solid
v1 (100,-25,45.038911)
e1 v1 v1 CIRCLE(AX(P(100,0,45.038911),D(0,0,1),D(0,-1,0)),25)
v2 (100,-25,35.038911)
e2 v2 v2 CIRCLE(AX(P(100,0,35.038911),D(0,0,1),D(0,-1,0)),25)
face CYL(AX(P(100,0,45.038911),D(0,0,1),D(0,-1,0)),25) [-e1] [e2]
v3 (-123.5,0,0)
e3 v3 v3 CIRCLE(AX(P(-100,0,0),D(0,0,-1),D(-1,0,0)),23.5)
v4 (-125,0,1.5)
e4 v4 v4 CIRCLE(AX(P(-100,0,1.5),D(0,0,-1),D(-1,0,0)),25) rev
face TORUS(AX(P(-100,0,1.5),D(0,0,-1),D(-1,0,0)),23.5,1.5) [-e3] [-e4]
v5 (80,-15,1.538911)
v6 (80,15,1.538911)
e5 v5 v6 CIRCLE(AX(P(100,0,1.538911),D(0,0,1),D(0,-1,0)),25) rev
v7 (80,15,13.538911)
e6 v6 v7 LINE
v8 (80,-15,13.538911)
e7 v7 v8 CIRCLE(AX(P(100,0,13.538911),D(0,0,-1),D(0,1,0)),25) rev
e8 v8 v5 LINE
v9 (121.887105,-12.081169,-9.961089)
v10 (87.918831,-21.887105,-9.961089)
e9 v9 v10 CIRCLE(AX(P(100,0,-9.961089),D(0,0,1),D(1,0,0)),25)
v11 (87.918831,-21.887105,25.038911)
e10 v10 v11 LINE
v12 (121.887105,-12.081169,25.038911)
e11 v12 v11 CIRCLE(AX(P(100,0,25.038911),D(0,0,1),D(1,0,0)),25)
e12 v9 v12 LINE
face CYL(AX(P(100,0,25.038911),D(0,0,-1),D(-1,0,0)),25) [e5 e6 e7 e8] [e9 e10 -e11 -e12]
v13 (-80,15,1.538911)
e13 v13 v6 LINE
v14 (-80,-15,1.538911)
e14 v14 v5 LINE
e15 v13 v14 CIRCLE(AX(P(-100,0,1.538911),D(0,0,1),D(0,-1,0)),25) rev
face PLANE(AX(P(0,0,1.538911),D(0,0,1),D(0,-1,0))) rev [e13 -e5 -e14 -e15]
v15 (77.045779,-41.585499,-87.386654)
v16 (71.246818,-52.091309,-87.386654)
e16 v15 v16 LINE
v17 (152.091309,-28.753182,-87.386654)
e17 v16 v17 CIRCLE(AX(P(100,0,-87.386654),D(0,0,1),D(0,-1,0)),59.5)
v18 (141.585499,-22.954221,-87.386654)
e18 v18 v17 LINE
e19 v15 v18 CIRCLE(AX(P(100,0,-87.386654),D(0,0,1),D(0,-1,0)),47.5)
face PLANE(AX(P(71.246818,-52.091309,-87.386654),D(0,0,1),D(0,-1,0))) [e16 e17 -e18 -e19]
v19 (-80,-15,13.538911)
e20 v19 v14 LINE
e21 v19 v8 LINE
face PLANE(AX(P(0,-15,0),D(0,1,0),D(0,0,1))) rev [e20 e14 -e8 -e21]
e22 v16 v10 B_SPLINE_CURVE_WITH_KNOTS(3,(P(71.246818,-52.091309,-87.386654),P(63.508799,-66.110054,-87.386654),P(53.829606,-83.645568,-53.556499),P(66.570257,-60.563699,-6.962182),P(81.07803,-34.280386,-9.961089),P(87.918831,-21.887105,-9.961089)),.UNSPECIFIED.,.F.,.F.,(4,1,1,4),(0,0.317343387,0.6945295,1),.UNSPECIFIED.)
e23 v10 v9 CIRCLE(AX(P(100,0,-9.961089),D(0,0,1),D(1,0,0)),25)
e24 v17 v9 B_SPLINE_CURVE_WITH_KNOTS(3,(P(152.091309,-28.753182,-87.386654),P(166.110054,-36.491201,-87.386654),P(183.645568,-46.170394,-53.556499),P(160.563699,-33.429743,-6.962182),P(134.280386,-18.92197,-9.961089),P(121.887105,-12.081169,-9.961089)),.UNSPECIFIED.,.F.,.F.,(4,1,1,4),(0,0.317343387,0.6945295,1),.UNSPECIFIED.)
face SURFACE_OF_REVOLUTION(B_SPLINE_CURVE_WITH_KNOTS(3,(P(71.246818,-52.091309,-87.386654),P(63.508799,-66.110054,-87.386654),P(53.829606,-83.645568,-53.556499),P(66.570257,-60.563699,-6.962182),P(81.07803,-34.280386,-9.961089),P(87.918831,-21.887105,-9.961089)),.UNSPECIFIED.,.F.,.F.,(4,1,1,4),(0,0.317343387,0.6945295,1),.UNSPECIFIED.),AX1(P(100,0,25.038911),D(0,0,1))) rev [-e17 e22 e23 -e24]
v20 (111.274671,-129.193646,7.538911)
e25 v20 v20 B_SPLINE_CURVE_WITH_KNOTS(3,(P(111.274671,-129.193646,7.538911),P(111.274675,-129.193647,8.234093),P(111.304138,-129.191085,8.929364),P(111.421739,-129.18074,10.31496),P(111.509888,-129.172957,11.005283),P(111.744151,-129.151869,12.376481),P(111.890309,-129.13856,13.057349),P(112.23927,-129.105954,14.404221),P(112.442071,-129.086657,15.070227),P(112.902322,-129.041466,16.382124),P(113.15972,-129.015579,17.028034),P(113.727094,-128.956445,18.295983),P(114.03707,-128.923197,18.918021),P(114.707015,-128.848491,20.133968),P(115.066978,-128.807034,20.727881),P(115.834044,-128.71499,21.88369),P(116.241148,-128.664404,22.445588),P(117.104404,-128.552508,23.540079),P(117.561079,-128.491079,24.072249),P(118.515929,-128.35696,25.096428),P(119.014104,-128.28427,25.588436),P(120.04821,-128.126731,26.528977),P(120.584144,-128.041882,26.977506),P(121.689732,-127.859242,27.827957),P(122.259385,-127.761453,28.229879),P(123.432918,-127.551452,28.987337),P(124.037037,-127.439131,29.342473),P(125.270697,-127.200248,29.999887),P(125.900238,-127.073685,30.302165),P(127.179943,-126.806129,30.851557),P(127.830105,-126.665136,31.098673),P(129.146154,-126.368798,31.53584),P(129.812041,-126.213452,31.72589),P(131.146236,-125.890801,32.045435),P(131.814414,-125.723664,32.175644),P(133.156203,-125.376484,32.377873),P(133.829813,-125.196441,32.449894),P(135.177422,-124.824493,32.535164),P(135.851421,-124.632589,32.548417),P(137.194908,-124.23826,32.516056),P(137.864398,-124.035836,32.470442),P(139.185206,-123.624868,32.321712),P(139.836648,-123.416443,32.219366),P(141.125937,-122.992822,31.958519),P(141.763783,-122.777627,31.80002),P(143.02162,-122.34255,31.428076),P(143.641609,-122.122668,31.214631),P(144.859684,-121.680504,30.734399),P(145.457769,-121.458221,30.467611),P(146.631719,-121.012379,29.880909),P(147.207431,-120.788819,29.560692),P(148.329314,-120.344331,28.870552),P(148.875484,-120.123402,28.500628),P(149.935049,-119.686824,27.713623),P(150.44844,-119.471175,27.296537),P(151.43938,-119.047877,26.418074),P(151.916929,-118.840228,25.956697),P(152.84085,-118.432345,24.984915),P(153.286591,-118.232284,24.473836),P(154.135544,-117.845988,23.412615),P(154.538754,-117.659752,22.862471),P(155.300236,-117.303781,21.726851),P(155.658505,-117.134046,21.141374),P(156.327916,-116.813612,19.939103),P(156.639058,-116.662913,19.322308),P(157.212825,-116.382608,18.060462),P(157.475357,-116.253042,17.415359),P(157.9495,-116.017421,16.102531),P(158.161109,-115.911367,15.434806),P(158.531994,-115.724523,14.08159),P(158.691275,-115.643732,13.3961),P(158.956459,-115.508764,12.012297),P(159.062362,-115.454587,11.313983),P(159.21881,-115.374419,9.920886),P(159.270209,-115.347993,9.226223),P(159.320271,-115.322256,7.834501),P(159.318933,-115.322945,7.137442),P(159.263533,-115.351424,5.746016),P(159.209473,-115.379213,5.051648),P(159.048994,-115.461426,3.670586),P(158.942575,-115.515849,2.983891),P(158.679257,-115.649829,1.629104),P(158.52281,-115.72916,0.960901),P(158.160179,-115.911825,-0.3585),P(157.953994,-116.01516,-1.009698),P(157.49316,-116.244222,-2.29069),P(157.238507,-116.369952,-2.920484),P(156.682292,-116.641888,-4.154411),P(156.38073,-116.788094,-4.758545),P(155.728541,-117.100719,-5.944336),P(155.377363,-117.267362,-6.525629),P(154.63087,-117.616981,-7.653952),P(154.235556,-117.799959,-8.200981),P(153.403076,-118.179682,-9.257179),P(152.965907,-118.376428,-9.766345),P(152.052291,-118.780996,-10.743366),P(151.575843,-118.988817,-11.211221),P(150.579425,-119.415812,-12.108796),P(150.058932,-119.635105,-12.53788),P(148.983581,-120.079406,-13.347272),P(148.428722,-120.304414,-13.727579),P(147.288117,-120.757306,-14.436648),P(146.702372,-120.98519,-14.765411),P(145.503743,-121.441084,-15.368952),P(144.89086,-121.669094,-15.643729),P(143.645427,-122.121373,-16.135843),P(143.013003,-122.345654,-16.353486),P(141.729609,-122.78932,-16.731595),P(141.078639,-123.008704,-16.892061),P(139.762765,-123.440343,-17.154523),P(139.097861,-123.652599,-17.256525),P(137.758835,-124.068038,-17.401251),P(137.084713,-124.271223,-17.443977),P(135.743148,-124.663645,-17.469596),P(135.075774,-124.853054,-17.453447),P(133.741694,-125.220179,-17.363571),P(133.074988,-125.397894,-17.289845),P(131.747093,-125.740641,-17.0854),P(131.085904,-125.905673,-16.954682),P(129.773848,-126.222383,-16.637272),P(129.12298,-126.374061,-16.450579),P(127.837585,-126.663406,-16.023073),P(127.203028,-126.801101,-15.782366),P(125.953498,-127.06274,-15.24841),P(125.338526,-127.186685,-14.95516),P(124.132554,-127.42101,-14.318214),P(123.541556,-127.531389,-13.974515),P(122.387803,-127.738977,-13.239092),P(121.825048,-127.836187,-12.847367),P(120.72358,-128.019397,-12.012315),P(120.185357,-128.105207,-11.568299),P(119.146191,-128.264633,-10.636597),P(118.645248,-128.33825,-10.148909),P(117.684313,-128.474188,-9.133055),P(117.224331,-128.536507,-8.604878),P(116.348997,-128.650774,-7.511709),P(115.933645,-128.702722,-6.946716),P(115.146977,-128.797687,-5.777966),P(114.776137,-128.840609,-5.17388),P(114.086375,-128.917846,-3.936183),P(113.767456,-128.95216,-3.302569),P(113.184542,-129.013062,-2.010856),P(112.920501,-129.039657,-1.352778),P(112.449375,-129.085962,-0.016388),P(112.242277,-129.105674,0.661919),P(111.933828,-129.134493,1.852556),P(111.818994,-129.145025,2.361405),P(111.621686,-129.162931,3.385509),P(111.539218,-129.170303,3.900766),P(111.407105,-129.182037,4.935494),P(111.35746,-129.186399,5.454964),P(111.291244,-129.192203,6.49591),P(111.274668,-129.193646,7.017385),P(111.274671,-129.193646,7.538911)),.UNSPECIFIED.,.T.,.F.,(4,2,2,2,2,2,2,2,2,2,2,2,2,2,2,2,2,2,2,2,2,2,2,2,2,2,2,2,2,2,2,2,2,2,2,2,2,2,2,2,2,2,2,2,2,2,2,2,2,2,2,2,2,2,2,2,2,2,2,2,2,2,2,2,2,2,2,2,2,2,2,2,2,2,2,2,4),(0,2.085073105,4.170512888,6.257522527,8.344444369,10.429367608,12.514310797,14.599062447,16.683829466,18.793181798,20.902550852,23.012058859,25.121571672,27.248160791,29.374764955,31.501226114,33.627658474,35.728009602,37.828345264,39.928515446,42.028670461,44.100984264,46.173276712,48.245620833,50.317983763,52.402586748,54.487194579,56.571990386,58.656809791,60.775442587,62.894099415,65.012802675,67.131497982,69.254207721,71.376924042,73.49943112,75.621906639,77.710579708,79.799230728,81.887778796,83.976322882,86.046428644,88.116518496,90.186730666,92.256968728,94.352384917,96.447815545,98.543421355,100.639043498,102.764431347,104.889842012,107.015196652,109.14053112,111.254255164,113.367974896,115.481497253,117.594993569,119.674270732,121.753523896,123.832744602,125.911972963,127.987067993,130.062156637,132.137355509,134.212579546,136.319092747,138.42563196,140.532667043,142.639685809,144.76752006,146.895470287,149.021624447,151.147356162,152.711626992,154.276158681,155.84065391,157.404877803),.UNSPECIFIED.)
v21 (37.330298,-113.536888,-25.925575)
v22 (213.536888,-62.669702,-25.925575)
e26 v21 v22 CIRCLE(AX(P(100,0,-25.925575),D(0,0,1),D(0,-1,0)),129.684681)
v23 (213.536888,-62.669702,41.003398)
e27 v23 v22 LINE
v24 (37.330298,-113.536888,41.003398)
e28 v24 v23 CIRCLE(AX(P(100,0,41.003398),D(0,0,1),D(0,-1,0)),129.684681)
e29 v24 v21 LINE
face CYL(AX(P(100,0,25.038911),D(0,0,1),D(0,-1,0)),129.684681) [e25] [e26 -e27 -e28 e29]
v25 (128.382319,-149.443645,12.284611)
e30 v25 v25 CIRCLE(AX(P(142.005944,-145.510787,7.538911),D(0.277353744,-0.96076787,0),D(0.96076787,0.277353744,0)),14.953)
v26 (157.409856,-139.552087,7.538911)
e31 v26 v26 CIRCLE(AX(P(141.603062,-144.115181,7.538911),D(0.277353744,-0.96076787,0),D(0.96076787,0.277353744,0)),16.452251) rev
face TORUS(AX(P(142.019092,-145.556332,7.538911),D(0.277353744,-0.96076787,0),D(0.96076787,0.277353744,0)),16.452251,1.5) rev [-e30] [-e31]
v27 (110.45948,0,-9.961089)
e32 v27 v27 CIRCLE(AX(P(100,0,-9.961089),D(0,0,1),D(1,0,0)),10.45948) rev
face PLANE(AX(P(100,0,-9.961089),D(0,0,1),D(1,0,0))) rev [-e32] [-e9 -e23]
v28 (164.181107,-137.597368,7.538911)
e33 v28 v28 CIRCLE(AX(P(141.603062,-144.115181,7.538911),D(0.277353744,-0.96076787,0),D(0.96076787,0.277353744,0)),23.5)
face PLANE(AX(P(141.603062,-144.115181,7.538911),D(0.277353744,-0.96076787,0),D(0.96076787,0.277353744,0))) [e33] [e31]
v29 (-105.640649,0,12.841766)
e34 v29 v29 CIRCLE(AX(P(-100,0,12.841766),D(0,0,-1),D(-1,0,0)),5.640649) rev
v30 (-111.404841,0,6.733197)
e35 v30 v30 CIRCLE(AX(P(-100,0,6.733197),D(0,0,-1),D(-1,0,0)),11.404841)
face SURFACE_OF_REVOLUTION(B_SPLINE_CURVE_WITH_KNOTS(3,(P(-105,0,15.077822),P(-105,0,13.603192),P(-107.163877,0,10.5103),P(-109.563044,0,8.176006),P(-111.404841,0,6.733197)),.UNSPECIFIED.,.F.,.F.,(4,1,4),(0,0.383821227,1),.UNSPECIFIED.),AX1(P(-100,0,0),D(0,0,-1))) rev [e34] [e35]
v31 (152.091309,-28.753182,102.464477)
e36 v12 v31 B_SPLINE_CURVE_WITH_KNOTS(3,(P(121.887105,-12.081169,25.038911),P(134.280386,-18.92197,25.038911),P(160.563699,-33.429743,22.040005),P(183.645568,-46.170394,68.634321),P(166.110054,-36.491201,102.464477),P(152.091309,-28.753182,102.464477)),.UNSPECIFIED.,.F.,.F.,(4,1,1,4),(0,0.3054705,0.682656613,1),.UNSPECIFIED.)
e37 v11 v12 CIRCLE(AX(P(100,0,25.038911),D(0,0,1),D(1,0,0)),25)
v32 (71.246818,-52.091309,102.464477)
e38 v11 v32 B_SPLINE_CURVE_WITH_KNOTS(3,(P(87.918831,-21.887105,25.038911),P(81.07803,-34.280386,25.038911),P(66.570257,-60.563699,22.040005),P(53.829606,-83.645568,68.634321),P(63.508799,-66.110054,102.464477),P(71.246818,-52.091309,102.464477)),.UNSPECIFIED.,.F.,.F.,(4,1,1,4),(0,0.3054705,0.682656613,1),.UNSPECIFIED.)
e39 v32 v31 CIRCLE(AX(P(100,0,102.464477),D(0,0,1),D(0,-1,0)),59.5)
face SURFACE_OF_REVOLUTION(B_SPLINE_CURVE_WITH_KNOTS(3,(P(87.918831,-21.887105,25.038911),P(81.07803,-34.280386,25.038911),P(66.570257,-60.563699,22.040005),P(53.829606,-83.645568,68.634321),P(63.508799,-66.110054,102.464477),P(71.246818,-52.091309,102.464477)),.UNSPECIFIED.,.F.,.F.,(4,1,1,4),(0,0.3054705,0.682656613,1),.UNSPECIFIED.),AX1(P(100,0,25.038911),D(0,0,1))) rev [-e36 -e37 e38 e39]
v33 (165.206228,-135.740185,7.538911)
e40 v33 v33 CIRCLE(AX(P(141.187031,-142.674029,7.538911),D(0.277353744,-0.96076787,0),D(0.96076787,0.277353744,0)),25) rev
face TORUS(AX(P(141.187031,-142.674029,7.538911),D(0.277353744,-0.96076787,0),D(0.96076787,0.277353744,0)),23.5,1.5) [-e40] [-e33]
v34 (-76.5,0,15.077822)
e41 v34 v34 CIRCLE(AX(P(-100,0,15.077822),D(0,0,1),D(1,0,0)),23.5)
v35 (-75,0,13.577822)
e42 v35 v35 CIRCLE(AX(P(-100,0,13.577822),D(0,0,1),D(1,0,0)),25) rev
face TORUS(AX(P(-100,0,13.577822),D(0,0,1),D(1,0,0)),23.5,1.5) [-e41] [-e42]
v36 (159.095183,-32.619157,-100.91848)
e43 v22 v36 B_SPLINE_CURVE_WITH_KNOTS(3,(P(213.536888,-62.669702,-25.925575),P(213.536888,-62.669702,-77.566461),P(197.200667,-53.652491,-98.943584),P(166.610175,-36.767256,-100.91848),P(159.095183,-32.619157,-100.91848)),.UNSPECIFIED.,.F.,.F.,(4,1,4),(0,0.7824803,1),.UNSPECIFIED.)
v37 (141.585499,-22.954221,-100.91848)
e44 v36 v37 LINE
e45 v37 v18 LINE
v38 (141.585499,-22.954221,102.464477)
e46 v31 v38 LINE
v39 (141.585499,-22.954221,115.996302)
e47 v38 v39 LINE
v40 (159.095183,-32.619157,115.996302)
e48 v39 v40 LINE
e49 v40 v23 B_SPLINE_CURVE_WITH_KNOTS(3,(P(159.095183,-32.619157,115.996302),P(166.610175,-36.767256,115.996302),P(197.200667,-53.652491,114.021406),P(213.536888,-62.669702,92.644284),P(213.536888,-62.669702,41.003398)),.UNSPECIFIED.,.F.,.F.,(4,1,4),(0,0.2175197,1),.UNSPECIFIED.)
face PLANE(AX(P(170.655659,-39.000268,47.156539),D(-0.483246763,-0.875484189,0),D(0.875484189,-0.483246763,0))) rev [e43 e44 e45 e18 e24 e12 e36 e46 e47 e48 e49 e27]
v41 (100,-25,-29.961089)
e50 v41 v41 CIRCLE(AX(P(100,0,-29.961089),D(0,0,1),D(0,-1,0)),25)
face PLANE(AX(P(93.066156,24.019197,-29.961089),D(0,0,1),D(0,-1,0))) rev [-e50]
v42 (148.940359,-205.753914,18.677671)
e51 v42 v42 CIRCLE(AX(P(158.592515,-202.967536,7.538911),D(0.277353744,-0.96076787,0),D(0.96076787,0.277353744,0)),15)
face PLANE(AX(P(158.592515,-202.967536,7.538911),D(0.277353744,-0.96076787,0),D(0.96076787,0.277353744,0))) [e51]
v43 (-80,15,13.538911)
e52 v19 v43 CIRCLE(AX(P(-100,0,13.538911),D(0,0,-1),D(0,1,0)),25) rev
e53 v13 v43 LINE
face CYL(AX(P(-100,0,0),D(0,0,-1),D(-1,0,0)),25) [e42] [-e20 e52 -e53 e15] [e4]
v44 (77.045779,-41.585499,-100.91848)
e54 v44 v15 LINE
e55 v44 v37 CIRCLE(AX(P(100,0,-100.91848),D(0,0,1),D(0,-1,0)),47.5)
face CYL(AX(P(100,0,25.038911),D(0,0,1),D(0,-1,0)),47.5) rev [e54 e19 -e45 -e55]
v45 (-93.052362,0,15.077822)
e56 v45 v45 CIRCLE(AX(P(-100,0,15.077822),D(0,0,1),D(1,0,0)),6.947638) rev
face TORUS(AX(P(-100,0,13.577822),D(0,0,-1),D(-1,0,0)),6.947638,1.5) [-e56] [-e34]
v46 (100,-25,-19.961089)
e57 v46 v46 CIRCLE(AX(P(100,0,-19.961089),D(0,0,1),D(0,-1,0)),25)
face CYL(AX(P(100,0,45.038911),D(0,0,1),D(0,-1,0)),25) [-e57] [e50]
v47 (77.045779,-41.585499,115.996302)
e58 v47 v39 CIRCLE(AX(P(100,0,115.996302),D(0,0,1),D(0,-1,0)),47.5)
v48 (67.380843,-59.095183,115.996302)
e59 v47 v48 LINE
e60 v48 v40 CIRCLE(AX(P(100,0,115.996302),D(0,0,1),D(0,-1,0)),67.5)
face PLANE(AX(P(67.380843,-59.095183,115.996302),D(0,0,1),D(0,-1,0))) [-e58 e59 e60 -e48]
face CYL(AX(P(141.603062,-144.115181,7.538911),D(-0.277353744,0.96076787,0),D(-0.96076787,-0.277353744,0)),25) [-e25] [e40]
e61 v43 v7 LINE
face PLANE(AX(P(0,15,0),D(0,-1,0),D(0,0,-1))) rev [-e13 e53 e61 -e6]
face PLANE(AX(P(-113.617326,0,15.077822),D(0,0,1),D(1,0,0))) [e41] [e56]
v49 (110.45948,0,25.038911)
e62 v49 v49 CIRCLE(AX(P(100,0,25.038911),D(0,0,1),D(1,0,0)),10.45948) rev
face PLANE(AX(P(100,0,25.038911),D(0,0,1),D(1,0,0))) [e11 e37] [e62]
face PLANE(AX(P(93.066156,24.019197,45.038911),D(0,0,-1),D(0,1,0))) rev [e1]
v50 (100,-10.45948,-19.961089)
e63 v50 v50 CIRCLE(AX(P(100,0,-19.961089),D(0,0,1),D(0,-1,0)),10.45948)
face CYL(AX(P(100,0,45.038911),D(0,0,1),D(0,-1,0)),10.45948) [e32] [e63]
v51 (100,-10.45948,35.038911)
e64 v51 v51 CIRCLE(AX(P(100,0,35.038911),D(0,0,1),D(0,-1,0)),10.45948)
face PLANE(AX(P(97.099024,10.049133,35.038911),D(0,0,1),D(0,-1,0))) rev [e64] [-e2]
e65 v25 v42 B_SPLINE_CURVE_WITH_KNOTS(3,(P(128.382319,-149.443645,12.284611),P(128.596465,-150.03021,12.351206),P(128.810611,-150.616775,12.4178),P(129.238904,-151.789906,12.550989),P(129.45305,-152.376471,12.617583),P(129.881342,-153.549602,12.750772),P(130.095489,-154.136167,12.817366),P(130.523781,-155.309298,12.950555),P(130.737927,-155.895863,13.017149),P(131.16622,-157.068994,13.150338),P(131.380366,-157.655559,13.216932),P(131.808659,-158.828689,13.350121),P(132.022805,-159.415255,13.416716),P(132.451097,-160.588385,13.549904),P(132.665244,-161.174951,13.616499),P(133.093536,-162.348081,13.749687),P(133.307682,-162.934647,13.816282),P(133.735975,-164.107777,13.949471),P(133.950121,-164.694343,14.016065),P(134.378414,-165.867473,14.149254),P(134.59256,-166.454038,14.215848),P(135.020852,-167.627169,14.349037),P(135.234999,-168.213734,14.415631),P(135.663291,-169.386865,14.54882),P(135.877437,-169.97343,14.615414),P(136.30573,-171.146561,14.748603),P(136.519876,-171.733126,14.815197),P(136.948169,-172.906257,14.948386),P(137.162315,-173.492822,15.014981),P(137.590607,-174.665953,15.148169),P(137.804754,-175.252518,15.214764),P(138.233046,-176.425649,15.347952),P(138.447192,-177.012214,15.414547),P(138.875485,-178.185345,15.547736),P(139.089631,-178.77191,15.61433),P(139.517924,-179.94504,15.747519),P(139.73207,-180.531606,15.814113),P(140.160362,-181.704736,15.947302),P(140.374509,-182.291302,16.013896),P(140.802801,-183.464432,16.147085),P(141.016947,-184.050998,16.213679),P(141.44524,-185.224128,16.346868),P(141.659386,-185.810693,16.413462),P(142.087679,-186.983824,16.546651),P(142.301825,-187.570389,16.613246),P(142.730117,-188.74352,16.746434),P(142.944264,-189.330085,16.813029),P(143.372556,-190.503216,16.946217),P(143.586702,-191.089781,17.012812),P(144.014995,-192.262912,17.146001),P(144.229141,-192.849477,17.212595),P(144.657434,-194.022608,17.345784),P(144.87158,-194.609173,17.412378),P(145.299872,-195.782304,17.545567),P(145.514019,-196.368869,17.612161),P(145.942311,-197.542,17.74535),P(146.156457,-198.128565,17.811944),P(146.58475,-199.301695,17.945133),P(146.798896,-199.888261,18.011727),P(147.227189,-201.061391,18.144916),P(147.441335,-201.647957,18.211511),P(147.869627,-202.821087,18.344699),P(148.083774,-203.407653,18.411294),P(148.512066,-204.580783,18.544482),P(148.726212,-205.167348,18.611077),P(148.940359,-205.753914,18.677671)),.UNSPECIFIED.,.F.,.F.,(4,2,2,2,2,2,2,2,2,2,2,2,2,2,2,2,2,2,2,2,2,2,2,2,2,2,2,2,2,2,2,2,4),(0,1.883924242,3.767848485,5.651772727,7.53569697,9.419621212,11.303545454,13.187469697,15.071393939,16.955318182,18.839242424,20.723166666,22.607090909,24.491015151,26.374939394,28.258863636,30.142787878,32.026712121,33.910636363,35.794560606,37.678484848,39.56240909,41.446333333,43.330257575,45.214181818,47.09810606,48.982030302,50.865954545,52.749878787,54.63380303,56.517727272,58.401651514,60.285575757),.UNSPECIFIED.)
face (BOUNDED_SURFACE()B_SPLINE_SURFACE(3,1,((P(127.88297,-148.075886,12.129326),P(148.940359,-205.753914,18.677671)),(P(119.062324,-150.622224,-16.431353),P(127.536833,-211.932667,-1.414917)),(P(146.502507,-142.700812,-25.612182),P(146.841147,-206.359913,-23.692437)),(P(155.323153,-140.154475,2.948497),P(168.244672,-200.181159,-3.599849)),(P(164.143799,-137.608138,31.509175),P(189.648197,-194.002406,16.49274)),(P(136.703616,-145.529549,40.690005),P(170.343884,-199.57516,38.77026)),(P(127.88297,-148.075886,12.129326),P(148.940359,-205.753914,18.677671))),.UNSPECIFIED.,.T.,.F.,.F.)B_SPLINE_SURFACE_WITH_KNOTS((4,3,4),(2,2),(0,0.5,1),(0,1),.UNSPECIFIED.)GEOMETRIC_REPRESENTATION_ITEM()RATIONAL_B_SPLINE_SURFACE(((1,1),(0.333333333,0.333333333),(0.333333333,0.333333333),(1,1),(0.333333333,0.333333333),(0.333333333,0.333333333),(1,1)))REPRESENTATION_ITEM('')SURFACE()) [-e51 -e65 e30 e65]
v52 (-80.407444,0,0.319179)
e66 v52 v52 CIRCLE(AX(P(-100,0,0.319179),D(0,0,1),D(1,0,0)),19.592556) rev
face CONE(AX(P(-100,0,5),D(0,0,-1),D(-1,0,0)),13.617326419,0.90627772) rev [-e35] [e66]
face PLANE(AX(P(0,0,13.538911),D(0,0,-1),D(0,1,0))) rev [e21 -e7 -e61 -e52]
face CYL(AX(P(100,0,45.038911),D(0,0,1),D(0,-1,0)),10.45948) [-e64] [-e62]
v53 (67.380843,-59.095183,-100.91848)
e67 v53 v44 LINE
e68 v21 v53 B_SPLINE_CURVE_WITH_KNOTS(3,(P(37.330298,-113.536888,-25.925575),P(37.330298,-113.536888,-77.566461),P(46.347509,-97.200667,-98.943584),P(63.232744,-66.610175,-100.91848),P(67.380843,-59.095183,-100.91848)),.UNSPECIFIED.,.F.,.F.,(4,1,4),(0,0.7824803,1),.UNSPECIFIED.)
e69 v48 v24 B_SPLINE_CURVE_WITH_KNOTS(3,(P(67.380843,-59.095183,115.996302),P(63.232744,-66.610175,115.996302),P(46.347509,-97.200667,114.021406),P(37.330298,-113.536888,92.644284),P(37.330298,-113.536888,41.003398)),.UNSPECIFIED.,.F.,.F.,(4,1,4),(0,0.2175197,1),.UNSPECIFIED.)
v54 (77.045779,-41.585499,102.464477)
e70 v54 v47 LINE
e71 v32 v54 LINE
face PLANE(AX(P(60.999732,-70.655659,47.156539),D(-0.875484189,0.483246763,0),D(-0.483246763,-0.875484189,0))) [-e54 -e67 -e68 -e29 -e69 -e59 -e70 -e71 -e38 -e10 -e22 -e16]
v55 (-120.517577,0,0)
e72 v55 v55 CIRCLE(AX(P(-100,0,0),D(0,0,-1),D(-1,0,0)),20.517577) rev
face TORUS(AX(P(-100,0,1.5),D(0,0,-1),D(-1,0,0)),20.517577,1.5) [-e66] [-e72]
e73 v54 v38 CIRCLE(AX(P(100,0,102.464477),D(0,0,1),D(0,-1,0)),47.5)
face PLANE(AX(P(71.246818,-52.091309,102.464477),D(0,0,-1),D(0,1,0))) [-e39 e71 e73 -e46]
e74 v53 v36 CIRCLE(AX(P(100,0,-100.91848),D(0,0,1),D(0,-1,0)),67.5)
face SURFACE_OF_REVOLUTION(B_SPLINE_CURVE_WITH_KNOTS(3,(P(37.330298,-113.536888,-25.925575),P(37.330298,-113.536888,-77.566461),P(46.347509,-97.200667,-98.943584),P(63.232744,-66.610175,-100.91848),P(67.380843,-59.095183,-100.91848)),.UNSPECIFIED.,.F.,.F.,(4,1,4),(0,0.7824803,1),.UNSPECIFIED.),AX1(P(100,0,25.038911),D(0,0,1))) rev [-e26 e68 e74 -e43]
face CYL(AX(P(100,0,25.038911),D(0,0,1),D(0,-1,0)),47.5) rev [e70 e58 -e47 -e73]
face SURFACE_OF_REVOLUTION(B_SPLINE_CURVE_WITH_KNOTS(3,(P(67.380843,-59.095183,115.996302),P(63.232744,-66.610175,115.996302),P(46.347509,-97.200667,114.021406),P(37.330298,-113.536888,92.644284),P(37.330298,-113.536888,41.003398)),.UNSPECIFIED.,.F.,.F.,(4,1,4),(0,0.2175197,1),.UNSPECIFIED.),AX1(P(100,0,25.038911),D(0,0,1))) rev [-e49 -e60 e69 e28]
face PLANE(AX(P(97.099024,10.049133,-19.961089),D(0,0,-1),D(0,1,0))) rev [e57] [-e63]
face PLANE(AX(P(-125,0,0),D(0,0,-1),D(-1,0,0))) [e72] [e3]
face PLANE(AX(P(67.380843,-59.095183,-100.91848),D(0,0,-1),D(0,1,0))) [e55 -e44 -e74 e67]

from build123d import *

# Parameters (mm, degrees)
FILLET3_R           = 1.5
SKETCH10_R          = 25
BOSS_EXTRUDE2_DEPTH = 17.5
REVOLVE3_ANGLE      = 90
SKETCH19_R          = 25
BOSS_EXTRUDE3_DEPTH = 50
FILLET6_R           = 1.5


with BuildPart() as part:
    # Revolve2: read off the stored shape, not the designer's step
    # Revolve2 outline → Revolve2 (revolve)
    with BuildSketch(Plane(origin=(-100, 0, 0), x_dir=(1, 0, 0), z_dir=(0, -1, 0))):
        with BuildLine():
            Line((25, 15.077822465), (5, 15.077822465))
            add(Edge.make_bspline(
                [(5, 15.077822465), (5, 13.603191541), (7.163877182, 10.510300403), (9.563044246, 8.1760062), (11.404840794, 6.733196596)],
                knots=[0, 0, 0, 0, 0.383821227, 1, 1, 1, 1], degree=3))
            Line((11.404840794, 6.733196596), (20, 0))
            Line((20, 0), (25, 0))
            Line((25, 0), (25, 15.077822465))
        make_face()
    revolve(axis=Axis((-100, 0, 0), (0, 0, 1)))

    # Sketch6 → Loft2 section 0
    with BuildSketch(Plane(origin=(-80, 0, 0), x_dir=(0, 0, -1), z_dir=(1, 0, 0))):
        with BuildLine():
            Line((-13.538911233, 15), (-1.538911233, 15))
            Line((-1.538911233, 15), (-1.538911233, -15))
            Line((-1.538911233, -15), (-13.538911233, -15))
            Line((-13.538911233, -15), (-13.538911233, 15))
        make_face()
    # Sketch5 → Loft2 section 1
    with BuildSketch(Plane(origin=(80, 0, 0), x_dir=(0, 0, -1), z_dir=(1, 0, 0))):
        with BuildLine():
            Line((-1.538911233, 15), (-13.538911233, 15))
            Line((-13.538911233, 15), (-13.538911233, -15))
            Line((-13.538911233, -15), (-1.538911233, -15))
            Line((-1.538911233, -15), (-1.538911233, 15))
        make_face()
    loft()

    # Fillet3
    fillet3_edges = [part.edges().sort_by_distance(p)[0] for p in [
        (-125, 0, 0),
        (-120, 0, 0),
        (-105, 0, 15.077822465),
        (-125, 0, 15.077822465),
    ]]
    fillet(fillet3_edges, radius=FILLET3_R)

    # Sketch10 → Boss-Extrude2 (add, symmetric)
    with BuildSketch(Plane.XY.offset(7.538911233)):
        with Locations((100, 0)):
            Circle(SKETCH10_R)
    extrude(amount=BOSS_EXTRUDE2_DEPTH, both=True)

    # Sketch13 → Revolve3 (revolve, symmetric)
    with BuildSketch(Plane(origin=(92.307490084, 26.647256571, 0), x_dir=(0, 0, -1), z_dir=(0.9607678704250572, 0.27735374372613175, 0))) as revolve3_sk:
        with BuildLine():
            Line((-41.003397863, -157.420055221), (25.925575398, -157.420055221))
            add(Edge.make_bspline(
                [(100.918479625, -95.235374373), (100.918479625, -103.819187393), (98.943583911, -138.760414592), (77.566461401, -157.420055221), (25.925575398, -157.420055221)],
                knots=[0, 0, 0, 0, 0.2175197, 1, 1, 1, 1], degree=3))
            Line((100.918479625, -95.235374373), (100.918479625, -75.235374373))
            Line((100.918479625, -75.235374373), (87.386654253, -75.235374373))
            Line((87.386654253, -75.235374373), (87.386654253, -87.235374373))
            add(Edge.make_bspline(
                [(9.961088767, -52.735374373), (9.961088767, -66.891290807), (6.962182075, -96.91274992), (53.556498987, -123.277440042), (87.386654253, -103.247936142), (87.386654253, -87.235374373)],
                knots=[0, 0, 0, 0, 0.3054705, 0.682656613, 1, 1, 1, 1], degree=3))
            Line((9.961088767, -52.735374373), (-25.038911233, -52.735374373))
            add(Edge.make_bspline(
                [(-25.038911233, -52.735374373), (-25.038911233, -66.891290807), (-22.04000454, -96.91274992), (-68.634321452, -123.277440042), (-102.464476718, -103.247936142), (-102.464476718, -87.235374373)],
                knots=[0, 0, 0, 0, 0.3054705, 0.682656613, 1, 1, 1, 1], degree=3))
            Line((-102.464476718, -87.235374373), (-102.464476718, -75.235374373))
            Line((-102.464476718, -75.235374373), (-115.99630209, -75.235374373))
            Line((-115.99630209, -75.235374373), (-115.99630209, -95.235374373))
            add(Edge.make_bspline(
                [(-115.99630209, -95.235374373), (-115.99630209, -103.819187393), (-114.021406376, -138.760414592), (-92.644283866, -157.420055221), (-41.003397863, -157.420055221)],
                knots=[0, 0, 0, 0, 0.2175197, 1, 1, 1, 1], degree=3))
        make_face()
    revolve(axis=Axis((100, 0, 25.038911233), (0, 0, -1)), revolution_arc=REVOLVE3_ANGLE / 2)
    revolve(revolve3_sk.sketch, axis=Axis((100, 0, 25.038911233), (0, 0, 1)), revolution_arc=REVOLVE3_ANGLE / 2)

    # Sketch19 → Boss-Extrude3 (add)
    with BuildSketch(Plane(origin=(35.427884289, -122.724043613, 0), x_dir=(-0.9607678704226367, -0.27735374373451605, 0), z_dir=(0.27735374373451605, -0.9607678704226368, 0))):
        with Locations((-96.076787042, -7.538911233)):
            Circle(SKETCH19_R)
    extrude(amount=BOSS_EXTRUDE3_DEPTH)

    # Loft4: read off the stored shape, not the designer's step
    # Loft4: loft between two sections, ruled curve by curve
    loft4_from = [
        Edge.make_bspline([(127.882970281, -148.075886157, 12.129325865), (119.062324499, -150.622223525, -16.431352943), (146.502507055, -142.700812334, -25.612182209), (155.323152838, -140.154474966, 2.9484966), (164.14379862, -137.608137599, 31.509175408), (136.703616063, -145.52954879, 40.690004674), (127.882970281, -148.075886157, 12.129325865)], [0, 0, 0, 0, 0.5, 0.5, 0.5, 1, 1, 1, 1], 3, [1, 0.333333333, 0.333333333, 1, 0.333333333, 0.333333333, 1]),
    ]
    loft4_to = [
        Edge.make_bspline([(148.940358563, -205.753913799, 18.677671161), (127.536833252, -211.932667332, -1.41491725), (146.841146631, -206.359912715, -23.692437107), (168.244671942, -200.181159182, -3.599848696), (189.648197253, -194.002405649, 16.492739715), (170.343883874, -199.575160266, 38.770259572), (148.940358563, -205.753913799, 18.677671161)], [0, 0, 0, 0, 0.5, 0.5, 0.5, 1, 1, 1, 1], 3, [1, 0.333333333, 0.333333333, 1, 0.333333333, 0.333333333, 1]),
    ]
    loft4 = Solid(Shell([*[Face.make_surface_from_curves(loft4_from[k], loft4_to[k]) for k in range(1)], Face(Wire(loft4_from)), Face(Wire(loft4_to))]))
    add(loft4)

    # Fillet6
    fillet6_edges = [part.edges().sort_by_distance(p)[0] for p in [
        (165.62225832, -137.181336969, 7.538911233),
        (155.323152838, -140.154474966, 2.9484966),
    ]]
    fillet(fillet6_edges, radius=FILLET6_R)

    # Sketch24 → Revolve4 (revolve)
    with BuildSketch(Plane(origin=(92.307490084, 26.647256571, 0), x_dir=(0, 0, -1), z_dir=(0.9607678704250572, 0.27735374372613175, 0)), mode=Mode.PRIVATE) as revolve4_sk:
        Polygon((-25.038911233, -17.275893978), (-35.038911233, -17.275893978), (-35.038911233, -2.735374373), (-45.038911233, -2.735374373), (-45.038911233, -27.735374373), (29.961088767, -27.735374373), (29.961088767, -2.735374373), (19.961088767, -2.735374373), (19.961088767, -17.275893978), (9.961088767, -17.275893978), align=None)
    revolve(revolve4_sk.sketch.rotate(Axis((100, 0, 45.038911233), (0, 0, -1)), 196.102331159), axis=Axis((100, 0, 45.038911233), (0, 0, -1)))


solid = part.part
